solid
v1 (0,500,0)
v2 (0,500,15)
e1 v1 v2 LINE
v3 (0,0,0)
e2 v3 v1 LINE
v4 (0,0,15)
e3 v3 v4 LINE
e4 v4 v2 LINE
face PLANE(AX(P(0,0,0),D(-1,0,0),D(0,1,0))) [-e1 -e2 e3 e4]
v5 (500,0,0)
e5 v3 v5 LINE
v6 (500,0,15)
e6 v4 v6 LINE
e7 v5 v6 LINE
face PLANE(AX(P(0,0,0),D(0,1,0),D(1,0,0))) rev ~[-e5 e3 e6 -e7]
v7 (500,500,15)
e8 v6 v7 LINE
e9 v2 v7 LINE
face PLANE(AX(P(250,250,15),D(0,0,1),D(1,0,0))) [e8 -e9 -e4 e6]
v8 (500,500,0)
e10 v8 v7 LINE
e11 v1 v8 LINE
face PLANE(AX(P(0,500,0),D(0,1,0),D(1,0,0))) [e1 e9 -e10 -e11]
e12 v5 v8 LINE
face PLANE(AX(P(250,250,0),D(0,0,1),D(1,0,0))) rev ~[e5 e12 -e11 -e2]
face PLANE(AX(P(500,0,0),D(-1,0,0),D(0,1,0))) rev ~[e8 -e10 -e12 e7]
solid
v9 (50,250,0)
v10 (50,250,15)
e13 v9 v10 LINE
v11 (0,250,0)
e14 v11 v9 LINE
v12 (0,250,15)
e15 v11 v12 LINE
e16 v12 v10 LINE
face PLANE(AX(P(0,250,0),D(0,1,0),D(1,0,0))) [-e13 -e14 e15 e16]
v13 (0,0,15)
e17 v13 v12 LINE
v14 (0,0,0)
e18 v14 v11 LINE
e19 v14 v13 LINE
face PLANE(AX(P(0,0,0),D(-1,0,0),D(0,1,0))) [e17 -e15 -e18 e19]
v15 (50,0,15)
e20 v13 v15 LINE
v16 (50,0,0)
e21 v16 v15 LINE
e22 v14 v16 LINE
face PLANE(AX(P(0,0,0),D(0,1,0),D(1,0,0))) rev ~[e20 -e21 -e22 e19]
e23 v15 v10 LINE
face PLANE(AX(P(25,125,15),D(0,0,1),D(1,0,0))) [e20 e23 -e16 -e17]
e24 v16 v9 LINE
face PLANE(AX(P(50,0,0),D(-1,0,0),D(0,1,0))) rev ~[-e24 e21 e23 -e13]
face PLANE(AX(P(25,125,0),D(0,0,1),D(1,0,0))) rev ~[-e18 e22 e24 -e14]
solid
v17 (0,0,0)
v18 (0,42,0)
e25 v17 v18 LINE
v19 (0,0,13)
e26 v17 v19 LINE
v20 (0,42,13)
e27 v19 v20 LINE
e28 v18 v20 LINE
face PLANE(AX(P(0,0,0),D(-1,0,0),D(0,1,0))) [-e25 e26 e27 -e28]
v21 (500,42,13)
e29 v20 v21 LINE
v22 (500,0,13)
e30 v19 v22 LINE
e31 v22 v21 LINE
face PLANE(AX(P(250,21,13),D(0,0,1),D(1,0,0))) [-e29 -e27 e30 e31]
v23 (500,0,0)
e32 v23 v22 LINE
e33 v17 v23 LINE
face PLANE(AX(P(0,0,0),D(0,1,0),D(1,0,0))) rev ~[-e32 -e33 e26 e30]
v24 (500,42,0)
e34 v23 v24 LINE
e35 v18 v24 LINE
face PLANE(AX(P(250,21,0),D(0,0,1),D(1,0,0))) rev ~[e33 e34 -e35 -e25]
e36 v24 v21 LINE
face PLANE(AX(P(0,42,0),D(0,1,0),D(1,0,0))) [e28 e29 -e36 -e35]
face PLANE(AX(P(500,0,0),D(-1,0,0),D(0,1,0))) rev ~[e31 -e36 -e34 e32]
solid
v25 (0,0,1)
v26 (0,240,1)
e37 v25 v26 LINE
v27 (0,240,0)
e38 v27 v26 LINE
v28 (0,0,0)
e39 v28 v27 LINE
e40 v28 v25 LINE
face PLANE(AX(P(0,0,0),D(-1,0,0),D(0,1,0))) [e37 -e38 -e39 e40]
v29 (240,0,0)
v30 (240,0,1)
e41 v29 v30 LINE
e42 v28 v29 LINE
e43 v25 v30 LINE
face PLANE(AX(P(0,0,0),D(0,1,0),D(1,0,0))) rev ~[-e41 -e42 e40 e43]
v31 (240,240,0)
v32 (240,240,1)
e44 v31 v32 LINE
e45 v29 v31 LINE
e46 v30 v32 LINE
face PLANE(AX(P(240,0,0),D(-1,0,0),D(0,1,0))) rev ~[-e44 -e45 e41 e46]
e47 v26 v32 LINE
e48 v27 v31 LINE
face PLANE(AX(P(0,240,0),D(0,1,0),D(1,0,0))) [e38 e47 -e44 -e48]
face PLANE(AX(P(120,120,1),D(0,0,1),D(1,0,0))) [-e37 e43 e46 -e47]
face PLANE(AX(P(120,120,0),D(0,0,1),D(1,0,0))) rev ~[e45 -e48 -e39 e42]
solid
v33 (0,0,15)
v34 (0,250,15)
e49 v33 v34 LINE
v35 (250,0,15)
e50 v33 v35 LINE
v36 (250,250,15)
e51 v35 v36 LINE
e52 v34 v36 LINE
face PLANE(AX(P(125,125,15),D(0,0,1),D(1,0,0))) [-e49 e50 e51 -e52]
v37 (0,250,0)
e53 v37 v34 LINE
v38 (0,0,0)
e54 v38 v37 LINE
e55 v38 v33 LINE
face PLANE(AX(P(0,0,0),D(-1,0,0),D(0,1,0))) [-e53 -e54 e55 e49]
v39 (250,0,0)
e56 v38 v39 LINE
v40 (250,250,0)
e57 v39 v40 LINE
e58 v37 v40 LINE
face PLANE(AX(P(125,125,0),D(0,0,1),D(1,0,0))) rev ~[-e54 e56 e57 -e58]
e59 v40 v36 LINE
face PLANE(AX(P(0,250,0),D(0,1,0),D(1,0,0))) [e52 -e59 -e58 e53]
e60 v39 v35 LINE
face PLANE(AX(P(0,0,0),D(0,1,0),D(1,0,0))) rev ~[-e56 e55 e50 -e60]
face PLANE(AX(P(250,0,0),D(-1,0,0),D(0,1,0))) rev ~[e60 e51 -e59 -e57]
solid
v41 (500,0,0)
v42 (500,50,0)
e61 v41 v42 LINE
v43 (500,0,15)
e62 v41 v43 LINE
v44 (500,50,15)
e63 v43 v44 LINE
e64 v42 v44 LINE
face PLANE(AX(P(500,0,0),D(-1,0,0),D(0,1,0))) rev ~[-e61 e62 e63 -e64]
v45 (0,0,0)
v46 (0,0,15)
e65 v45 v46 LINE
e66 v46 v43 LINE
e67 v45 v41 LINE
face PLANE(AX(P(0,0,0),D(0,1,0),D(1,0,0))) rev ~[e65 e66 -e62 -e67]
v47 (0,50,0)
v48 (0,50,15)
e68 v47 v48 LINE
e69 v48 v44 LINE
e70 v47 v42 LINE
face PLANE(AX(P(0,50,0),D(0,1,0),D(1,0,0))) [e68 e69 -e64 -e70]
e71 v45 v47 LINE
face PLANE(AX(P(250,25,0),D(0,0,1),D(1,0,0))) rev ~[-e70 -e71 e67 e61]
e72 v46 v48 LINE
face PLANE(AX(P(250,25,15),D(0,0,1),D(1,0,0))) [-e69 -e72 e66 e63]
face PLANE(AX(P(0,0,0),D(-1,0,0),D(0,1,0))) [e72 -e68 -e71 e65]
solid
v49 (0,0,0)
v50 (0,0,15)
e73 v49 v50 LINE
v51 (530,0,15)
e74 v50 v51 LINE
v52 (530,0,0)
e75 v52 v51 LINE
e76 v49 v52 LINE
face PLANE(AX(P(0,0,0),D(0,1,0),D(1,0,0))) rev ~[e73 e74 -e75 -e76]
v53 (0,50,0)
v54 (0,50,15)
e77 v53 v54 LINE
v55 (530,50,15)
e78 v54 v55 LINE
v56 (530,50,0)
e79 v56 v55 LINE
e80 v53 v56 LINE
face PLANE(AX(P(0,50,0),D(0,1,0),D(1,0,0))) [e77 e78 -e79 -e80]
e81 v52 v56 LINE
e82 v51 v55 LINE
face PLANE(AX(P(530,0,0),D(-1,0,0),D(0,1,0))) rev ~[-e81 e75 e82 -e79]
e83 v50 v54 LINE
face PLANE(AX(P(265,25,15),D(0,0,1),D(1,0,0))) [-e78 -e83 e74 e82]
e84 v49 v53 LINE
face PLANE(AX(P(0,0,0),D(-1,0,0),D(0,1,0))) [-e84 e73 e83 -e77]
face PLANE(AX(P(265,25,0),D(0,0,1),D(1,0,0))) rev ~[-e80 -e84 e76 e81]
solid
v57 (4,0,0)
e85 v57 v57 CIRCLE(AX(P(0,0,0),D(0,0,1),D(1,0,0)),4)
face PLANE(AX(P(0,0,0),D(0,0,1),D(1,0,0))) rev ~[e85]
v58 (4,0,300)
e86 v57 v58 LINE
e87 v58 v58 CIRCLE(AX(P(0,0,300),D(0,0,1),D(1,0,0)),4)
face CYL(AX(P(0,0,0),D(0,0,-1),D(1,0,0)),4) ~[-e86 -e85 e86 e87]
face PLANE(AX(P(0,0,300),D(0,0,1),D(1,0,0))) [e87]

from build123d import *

# Parameters (mm, degrees)
F0_R      = 4
F1_DEPTH  = 300
F2_W      = 500
F2_H      = 42
F3_DEPTH  = 13
F4_W      = 500
F4_H      = 500
F5_DEPTH  = 15
F6_W      = 240
F6_H      = 240
F7_DEPTH  = 1
F8_W      = 50
F8_H      = 250
F9_DEPTH  = 15
F10_W     = 530
F10_H     = 50
F11_DEPTH = 15
F12_W     = 250
F12_H     = 250
F13_DEPTH = 15
F14_W     = 500
F14_H     = 50
F15_DEPTH = 15


# Not quite as in the source:
# - a feature names something its author has since deleted; it is built from what else it names


with BuildPart() as f1:
    # F0 (on Top) → F1 (new body)
    with BuildSketch(Plane.XY):
        Circle(F0_R)
    extrude(amount=F1_DEPTH)


with BuildPart() as f3:
    # F2 (on Top) → F3 (new body)
    with BuildSketch(Plane.XY):
        with Locations((250, 21)):
            Rectangle(F2_W, F2_H)
    extrude(amount=F3_DEPTH)


with BuildPart() as f5:
    # F4 (on Top) → F5 (new body)
    with BuildSketch(Plane.XY):
        with Locations((250, 250)):
            Rectangle(F4_W, F4_H)
    extrude(amount=F5_DEPTH)


with BuildPart() as f7:
    # F6 (on Top) → F7 (new body)
    with BuildSketch(Plane.XY):
        with Locations((120, 120)):
            Rectangle(F6_W, F6_H)
    extrude(amount=F7_DEPTH)


with BuildPart() as f9:
    # F8 (on Top) → F9 (new body)
    with BuildSketch(Plane.XY):
        with Locations((25, 125)):
            Rectangle(F8_W, F8_H)
    extrude(amount=F9_DEPTH)


with BuildPart() as f11:
    # F10 (on Top) → F11 (new body)
    with BuildSketch(Plane.XY):
        with Locations((265, 25)):
            Rectangle(F10_W, F10_H)
    extrude(amount=F11_DEPTH)


with BuildPart() as f13:
    # F12 (on Top) → F13 (new body)
    with BuildSketch(Plane.XY):
        with Locations((125, 125)):
            Rectangle(F12_W, F12_H)
    extrude(amount=F13_DEPTH)


with BuildPart() as f15:
    # F14 (on Top) → F15 (new body)
    with BuildSketch(Plane.XY):
        with Locations((250, 25)):
            Rectangle(F14_W, F14_H)
    extrude(amount=F15_DEPTH)


solid = Compound([f1.part, f3.part, f5.part, f7.part, f9.part, f11.part, f13.part, f15.part])
